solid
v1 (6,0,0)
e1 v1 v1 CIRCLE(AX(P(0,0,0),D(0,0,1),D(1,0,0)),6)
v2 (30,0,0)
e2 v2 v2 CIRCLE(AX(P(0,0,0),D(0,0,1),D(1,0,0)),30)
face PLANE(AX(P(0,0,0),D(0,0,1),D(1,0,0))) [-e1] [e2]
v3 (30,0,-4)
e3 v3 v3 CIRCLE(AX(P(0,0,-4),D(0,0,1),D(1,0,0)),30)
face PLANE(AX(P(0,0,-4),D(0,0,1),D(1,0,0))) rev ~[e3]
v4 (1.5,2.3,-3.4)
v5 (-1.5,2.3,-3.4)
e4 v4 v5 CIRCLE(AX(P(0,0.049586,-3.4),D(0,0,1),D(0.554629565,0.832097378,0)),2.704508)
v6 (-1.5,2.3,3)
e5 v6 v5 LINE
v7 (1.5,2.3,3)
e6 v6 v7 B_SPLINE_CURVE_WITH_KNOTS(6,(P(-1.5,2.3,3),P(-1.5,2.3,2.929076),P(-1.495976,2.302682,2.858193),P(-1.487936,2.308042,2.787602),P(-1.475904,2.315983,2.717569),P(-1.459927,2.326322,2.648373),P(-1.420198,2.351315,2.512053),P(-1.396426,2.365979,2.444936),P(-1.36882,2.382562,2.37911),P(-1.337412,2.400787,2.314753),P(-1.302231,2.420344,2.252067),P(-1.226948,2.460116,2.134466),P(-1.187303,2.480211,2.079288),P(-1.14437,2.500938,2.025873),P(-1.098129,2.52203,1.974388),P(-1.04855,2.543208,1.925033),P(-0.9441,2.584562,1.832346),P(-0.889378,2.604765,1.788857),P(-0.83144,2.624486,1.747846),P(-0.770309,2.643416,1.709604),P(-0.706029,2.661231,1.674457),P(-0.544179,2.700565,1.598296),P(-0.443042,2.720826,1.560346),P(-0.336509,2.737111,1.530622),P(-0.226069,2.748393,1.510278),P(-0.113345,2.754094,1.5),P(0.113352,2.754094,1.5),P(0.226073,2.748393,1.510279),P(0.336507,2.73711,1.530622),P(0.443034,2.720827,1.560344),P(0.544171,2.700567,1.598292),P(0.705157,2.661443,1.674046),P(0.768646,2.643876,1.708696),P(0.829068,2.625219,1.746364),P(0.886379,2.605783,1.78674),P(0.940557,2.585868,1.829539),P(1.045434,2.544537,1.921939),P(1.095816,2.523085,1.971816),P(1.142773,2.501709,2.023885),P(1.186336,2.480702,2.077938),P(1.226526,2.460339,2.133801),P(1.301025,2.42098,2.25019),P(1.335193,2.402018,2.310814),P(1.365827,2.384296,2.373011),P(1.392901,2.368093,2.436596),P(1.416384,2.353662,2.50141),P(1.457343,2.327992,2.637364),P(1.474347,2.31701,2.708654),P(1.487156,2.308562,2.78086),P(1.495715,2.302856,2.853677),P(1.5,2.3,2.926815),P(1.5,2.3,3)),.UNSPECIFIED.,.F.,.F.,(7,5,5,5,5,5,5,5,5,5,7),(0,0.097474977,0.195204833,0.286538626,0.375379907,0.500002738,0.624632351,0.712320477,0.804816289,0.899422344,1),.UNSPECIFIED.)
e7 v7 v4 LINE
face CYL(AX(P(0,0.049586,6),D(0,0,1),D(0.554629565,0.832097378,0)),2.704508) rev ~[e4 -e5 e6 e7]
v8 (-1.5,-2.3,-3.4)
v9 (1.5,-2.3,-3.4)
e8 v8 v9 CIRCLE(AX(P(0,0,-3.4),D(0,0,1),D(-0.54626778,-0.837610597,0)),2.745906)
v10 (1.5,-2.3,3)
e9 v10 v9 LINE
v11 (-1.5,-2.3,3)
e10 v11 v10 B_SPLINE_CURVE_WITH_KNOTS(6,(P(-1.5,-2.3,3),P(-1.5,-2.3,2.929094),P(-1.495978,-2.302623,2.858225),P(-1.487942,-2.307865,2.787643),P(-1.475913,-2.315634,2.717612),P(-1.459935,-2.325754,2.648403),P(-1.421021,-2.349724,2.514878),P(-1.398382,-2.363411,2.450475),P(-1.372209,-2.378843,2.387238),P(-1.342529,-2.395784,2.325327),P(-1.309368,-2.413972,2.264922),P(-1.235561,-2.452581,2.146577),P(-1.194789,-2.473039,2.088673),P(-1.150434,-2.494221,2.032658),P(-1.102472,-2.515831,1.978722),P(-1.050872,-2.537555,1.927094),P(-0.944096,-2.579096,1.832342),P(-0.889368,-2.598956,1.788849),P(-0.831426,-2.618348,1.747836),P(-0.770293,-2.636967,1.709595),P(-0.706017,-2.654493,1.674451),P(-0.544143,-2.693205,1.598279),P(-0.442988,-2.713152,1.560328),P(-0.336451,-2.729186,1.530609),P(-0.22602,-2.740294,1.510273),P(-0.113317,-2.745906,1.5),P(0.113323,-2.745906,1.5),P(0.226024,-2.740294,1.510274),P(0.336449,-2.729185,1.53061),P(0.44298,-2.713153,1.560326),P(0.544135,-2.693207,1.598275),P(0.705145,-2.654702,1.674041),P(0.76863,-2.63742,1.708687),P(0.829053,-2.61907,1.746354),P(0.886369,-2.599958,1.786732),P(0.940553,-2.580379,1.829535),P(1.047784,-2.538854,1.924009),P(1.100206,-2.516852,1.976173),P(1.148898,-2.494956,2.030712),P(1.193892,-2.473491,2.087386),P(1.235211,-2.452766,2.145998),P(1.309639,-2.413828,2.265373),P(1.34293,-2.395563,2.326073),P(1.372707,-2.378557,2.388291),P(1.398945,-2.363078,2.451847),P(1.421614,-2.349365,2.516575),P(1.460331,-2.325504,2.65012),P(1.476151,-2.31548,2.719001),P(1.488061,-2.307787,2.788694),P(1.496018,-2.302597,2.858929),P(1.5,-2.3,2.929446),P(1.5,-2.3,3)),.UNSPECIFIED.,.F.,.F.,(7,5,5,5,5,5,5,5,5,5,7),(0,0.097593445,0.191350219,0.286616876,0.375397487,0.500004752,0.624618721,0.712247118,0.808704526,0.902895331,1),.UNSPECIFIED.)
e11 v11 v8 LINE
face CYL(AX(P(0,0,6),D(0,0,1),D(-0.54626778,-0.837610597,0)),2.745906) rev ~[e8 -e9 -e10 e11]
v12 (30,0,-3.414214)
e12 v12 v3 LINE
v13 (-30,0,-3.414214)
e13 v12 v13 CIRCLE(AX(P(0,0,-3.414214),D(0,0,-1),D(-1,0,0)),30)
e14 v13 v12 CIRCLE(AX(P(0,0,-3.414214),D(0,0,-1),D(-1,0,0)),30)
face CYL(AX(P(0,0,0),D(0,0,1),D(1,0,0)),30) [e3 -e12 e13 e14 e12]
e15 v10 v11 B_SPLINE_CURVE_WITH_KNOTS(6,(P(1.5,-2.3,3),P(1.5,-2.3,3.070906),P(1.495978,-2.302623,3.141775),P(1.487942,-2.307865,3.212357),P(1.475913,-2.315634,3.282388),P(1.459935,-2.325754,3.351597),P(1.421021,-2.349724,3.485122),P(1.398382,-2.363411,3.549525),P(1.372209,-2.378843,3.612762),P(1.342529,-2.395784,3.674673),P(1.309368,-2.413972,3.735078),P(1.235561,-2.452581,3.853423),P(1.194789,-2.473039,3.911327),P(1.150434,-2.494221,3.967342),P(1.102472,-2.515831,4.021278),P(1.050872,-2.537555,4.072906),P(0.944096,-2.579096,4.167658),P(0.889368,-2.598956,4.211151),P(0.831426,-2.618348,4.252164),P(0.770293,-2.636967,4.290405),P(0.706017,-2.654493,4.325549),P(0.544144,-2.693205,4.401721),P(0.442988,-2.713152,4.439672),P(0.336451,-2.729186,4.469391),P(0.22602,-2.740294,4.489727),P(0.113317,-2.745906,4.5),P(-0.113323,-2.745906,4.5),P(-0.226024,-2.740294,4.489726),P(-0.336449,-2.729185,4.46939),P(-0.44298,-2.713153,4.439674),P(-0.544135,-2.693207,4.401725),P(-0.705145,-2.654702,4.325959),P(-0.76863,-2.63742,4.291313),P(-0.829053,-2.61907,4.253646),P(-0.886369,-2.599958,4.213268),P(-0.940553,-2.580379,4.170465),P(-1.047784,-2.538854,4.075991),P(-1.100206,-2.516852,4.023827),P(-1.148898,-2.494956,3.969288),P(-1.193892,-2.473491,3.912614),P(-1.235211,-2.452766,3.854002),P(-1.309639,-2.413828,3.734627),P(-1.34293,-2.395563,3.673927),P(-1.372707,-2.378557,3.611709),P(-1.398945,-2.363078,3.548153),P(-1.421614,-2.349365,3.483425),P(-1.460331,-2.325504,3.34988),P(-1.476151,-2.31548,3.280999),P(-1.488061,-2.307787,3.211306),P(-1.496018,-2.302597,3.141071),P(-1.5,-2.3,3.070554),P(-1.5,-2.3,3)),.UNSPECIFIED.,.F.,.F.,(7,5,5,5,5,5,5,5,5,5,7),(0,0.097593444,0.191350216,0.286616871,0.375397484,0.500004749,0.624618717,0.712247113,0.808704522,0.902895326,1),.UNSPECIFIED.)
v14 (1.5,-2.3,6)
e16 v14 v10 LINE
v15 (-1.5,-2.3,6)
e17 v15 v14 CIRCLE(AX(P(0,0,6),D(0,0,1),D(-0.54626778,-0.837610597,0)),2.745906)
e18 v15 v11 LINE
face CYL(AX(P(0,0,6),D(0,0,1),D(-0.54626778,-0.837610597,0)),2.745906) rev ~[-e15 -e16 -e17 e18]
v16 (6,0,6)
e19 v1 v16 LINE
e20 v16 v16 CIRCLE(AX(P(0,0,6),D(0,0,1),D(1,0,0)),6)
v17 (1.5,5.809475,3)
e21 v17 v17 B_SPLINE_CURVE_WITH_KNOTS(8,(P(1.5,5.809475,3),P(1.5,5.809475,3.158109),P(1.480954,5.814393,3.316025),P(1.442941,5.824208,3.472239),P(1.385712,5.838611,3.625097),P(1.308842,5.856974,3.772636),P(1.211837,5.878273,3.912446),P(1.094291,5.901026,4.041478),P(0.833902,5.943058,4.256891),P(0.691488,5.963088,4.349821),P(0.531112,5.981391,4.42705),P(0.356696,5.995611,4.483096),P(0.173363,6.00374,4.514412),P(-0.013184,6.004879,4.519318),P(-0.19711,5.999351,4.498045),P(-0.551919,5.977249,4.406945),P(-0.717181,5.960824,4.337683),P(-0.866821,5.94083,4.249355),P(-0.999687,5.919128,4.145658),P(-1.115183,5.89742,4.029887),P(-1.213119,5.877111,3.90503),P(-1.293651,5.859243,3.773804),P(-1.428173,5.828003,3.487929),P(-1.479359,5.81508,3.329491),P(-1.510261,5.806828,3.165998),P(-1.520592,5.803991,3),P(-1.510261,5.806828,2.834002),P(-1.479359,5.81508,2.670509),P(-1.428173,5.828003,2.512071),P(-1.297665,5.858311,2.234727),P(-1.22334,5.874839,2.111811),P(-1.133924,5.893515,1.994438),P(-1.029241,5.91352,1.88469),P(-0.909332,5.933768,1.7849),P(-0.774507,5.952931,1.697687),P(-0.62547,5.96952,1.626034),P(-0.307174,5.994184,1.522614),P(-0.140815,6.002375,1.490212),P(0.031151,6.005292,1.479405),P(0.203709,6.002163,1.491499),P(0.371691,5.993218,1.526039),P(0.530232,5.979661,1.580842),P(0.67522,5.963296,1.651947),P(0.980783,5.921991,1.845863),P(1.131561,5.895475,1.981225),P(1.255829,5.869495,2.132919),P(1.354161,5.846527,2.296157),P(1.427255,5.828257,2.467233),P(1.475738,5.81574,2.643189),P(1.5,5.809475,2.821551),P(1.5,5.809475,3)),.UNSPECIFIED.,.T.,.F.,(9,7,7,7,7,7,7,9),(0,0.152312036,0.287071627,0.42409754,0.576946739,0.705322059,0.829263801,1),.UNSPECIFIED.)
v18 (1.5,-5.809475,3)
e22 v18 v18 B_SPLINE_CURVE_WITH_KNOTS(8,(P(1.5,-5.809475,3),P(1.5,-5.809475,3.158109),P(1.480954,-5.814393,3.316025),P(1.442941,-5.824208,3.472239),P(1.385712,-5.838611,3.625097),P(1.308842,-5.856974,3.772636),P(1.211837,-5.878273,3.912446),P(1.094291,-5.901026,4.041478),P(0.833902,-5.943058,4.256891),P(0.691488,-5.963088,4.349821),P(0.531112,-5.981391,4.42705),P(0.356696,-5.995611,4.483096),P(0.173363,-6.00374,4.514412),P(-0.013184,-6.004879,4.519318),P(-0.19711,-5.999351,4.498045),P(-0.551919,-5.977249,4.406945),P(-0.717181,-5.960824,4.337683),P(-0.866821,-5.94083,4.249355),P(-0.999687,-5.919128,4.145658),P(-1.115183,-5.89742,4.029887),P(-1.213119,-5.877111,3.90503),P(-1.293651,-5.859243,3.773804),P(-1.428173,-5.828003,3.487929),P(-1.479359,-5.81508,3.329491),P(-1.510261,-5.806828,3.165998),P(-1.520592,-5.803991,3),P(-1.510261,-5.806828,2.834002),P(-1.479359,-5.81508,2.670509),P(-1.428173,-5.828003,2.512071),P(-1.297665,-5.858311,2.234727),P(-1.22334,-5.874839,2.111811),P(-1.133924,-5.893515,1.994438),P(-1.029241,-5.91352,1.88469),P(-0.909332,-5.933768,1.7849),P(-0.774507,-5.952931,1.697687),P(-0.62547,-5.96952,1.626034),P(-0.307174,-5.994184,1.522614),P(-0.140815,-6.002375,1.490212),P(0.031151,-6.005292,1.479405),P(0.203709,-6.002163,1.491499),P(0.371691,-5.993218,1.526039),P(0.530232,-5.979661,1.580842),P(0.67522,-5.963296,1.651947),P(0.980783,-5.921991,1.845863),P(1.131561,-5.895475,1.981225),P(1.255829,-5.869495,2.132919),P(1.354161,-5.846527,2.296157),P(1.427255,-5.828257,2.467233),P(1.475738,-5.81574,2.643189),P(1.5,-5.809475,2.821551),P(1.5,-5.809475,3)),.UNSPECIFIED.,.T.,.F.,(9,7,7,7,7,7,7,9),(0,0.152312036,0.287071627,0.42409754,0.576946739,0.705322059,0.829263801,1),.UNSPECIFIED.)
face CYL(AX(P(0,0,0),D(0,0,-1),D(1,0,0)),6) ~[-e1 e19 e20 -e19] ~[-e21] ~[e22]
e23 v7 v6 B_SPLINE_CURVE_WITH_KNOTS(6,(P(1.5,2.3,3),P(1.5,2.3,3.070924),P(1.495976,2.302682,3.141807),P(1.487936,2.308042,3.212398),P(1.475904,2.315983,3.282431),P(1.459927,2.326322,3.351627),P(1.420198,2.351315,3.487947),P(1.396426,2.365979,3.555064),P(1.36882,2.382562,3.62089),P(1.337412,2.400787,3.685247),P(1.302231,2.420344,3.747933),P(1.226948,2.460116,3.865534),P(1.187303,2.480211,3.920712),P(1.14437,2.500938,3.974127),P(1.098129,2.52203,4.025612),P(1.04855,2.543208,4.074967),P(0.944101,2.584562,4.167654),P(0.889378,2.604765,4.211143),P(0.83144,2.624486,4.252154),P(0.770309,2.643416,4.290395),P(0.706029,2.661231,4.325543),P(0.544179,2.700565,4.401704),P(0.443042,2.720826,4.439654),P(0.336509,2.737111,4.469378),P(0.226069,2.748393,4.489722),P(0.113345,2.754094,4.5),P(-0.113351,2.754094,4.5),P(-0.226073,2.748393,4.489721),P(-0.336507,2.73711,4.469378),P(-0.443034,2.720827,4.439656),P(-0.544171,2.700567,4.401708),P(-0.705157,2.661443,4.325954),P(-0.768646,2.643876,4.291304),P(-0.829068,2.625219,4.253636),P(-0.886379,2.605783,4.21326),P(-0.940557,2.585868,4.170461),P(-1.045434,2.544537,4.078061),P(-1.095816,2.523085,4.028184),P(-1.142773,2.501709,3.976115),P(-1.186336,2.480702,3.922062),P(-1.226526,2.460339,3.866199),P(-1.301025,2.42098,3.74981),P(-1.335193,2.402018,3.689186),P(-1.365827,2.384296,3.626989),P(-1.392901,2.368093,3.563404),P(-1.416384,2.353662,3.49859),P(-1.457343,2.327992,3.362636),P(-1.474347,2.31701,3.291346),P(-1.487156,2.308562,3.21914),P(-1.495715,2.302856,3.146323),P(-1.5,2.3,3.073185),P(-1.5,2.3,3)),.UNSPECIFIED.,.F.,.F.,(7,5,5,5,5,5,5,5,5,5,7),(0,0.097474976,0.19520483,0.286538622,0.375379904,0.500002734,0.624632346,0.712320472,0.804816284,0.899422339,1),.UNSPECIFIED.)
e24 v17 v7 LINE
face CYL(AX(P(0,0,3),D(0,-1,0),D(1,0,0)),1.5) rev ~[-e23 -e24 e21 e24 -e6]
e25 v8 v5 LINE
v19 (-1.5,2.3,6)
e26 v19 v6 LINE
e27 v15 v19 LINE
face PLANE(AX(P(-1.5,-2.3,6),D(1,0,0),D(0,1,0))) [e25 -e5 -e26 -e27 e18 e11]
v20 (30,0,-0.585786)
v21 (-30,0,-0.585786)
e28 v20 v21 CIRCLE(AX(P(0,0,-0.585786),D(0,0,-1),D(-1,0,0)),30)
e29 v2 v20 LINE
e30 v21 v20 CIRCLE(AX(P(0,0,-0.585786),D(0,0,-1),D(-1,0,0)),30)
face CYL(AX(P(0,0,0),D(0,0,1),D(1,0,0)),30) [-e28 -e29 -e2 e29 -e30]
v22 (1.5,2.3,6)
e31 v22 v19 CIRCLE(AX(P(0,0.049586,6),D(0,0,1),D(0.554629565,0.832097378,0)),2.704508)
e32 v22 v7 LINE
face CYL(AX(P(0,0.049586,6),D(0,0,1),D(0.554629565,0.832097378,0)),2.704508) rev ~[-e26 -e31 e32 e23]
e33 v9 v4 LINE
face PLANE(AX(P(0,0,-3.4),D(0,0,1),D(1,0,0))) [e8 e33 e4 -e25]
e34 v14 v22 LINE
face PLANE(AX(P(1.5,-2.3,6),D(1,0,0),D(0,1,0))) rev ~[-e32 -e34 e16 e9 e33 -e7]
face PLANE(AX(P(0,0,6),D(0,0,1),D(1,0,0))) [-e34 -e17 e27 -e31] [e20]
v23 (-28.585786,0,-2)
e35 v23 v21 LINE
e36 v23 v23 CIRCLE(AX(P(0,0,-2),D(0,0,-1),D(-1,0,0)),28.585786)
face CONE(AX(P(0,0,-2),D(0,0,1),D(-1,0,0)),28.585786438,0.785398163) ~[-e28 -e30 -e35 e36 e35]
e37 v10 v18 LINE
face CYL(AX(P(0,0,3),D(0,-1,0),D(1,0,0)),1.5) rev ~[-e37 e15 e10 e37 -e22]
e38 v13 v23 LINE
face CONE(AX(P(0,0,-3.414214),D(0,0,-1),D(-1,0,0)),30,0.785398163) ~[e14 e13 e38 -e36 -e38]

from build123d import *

# Parameters (mm, degrees)
F0_R     = 30
F0_R_2   = 6
F1_DEPTH = 4
F2_DEPTH = 6
F3_R     = 1.5
F4_DEPTH = 12.5
F5_W     = 3
F5_H     = 4.6
F6_DEPTH = 9.4


with BuildPart() as f1:
    # F0 (on Top) → F1 (new body)
    with BuildSketch(Plane.XY):
        Circle(F0_R)
        Circle(F0_R_2, mode=Mode.SUBTRACT)
        Circle(F0_R_2)
    extrude(amount=-F1_DEPTH)

    # F0 (on Top) → F2 (join)
    with BuildSketch(Plane.XY):
        Circle(F0_R_2)
    extrude(amount=F2_DEPTH)

    # F3 (on Front) → F4 (cut, symmetric)
    with BuildSketch(Plane.XZ):
        with Locations((0, 3)):
            Circle(F3_R)
    extrude(amount=F4_DEPTH, both=True, mode=Mode.SUBTRACT)

    # F5 (on face) → F6 (cut)
    with BuildSketch(Plane.XY.offset(6)):
        Rectangle(F5_W, F5_H)
        with BuildLine():
            Line((-1.5, 2.3), (1.5, 2.3))
            ThreePointArc((1.5, 2.3), (0, 2.7540939565), (-1.5, 2.3))
        make_face()
        with BuildLine():
            ThreePointArc((-1.5, -2.3), (0, -2.7459060435), (1.5, -2.3))
            Line((1.5, -2.3), (-1.5, -2.3))
        make_face()
    extrude(amount=-F6_DEPTH, mode=Mode.SUBTRACT)

    # F7 (on Front) → F8 (revolve, cut)
    with BuildSketch(Plane.XZ):
        Polygon((-28.5857864376, -2), (-30, -0.5857864376), (-30, -3.4142135624), align=None)
    revolve(axis=Axis((0, 0, 0.2672639675), (0, 0, -1)), mode=Mode.SUBTRACT)


solid = f1.part
